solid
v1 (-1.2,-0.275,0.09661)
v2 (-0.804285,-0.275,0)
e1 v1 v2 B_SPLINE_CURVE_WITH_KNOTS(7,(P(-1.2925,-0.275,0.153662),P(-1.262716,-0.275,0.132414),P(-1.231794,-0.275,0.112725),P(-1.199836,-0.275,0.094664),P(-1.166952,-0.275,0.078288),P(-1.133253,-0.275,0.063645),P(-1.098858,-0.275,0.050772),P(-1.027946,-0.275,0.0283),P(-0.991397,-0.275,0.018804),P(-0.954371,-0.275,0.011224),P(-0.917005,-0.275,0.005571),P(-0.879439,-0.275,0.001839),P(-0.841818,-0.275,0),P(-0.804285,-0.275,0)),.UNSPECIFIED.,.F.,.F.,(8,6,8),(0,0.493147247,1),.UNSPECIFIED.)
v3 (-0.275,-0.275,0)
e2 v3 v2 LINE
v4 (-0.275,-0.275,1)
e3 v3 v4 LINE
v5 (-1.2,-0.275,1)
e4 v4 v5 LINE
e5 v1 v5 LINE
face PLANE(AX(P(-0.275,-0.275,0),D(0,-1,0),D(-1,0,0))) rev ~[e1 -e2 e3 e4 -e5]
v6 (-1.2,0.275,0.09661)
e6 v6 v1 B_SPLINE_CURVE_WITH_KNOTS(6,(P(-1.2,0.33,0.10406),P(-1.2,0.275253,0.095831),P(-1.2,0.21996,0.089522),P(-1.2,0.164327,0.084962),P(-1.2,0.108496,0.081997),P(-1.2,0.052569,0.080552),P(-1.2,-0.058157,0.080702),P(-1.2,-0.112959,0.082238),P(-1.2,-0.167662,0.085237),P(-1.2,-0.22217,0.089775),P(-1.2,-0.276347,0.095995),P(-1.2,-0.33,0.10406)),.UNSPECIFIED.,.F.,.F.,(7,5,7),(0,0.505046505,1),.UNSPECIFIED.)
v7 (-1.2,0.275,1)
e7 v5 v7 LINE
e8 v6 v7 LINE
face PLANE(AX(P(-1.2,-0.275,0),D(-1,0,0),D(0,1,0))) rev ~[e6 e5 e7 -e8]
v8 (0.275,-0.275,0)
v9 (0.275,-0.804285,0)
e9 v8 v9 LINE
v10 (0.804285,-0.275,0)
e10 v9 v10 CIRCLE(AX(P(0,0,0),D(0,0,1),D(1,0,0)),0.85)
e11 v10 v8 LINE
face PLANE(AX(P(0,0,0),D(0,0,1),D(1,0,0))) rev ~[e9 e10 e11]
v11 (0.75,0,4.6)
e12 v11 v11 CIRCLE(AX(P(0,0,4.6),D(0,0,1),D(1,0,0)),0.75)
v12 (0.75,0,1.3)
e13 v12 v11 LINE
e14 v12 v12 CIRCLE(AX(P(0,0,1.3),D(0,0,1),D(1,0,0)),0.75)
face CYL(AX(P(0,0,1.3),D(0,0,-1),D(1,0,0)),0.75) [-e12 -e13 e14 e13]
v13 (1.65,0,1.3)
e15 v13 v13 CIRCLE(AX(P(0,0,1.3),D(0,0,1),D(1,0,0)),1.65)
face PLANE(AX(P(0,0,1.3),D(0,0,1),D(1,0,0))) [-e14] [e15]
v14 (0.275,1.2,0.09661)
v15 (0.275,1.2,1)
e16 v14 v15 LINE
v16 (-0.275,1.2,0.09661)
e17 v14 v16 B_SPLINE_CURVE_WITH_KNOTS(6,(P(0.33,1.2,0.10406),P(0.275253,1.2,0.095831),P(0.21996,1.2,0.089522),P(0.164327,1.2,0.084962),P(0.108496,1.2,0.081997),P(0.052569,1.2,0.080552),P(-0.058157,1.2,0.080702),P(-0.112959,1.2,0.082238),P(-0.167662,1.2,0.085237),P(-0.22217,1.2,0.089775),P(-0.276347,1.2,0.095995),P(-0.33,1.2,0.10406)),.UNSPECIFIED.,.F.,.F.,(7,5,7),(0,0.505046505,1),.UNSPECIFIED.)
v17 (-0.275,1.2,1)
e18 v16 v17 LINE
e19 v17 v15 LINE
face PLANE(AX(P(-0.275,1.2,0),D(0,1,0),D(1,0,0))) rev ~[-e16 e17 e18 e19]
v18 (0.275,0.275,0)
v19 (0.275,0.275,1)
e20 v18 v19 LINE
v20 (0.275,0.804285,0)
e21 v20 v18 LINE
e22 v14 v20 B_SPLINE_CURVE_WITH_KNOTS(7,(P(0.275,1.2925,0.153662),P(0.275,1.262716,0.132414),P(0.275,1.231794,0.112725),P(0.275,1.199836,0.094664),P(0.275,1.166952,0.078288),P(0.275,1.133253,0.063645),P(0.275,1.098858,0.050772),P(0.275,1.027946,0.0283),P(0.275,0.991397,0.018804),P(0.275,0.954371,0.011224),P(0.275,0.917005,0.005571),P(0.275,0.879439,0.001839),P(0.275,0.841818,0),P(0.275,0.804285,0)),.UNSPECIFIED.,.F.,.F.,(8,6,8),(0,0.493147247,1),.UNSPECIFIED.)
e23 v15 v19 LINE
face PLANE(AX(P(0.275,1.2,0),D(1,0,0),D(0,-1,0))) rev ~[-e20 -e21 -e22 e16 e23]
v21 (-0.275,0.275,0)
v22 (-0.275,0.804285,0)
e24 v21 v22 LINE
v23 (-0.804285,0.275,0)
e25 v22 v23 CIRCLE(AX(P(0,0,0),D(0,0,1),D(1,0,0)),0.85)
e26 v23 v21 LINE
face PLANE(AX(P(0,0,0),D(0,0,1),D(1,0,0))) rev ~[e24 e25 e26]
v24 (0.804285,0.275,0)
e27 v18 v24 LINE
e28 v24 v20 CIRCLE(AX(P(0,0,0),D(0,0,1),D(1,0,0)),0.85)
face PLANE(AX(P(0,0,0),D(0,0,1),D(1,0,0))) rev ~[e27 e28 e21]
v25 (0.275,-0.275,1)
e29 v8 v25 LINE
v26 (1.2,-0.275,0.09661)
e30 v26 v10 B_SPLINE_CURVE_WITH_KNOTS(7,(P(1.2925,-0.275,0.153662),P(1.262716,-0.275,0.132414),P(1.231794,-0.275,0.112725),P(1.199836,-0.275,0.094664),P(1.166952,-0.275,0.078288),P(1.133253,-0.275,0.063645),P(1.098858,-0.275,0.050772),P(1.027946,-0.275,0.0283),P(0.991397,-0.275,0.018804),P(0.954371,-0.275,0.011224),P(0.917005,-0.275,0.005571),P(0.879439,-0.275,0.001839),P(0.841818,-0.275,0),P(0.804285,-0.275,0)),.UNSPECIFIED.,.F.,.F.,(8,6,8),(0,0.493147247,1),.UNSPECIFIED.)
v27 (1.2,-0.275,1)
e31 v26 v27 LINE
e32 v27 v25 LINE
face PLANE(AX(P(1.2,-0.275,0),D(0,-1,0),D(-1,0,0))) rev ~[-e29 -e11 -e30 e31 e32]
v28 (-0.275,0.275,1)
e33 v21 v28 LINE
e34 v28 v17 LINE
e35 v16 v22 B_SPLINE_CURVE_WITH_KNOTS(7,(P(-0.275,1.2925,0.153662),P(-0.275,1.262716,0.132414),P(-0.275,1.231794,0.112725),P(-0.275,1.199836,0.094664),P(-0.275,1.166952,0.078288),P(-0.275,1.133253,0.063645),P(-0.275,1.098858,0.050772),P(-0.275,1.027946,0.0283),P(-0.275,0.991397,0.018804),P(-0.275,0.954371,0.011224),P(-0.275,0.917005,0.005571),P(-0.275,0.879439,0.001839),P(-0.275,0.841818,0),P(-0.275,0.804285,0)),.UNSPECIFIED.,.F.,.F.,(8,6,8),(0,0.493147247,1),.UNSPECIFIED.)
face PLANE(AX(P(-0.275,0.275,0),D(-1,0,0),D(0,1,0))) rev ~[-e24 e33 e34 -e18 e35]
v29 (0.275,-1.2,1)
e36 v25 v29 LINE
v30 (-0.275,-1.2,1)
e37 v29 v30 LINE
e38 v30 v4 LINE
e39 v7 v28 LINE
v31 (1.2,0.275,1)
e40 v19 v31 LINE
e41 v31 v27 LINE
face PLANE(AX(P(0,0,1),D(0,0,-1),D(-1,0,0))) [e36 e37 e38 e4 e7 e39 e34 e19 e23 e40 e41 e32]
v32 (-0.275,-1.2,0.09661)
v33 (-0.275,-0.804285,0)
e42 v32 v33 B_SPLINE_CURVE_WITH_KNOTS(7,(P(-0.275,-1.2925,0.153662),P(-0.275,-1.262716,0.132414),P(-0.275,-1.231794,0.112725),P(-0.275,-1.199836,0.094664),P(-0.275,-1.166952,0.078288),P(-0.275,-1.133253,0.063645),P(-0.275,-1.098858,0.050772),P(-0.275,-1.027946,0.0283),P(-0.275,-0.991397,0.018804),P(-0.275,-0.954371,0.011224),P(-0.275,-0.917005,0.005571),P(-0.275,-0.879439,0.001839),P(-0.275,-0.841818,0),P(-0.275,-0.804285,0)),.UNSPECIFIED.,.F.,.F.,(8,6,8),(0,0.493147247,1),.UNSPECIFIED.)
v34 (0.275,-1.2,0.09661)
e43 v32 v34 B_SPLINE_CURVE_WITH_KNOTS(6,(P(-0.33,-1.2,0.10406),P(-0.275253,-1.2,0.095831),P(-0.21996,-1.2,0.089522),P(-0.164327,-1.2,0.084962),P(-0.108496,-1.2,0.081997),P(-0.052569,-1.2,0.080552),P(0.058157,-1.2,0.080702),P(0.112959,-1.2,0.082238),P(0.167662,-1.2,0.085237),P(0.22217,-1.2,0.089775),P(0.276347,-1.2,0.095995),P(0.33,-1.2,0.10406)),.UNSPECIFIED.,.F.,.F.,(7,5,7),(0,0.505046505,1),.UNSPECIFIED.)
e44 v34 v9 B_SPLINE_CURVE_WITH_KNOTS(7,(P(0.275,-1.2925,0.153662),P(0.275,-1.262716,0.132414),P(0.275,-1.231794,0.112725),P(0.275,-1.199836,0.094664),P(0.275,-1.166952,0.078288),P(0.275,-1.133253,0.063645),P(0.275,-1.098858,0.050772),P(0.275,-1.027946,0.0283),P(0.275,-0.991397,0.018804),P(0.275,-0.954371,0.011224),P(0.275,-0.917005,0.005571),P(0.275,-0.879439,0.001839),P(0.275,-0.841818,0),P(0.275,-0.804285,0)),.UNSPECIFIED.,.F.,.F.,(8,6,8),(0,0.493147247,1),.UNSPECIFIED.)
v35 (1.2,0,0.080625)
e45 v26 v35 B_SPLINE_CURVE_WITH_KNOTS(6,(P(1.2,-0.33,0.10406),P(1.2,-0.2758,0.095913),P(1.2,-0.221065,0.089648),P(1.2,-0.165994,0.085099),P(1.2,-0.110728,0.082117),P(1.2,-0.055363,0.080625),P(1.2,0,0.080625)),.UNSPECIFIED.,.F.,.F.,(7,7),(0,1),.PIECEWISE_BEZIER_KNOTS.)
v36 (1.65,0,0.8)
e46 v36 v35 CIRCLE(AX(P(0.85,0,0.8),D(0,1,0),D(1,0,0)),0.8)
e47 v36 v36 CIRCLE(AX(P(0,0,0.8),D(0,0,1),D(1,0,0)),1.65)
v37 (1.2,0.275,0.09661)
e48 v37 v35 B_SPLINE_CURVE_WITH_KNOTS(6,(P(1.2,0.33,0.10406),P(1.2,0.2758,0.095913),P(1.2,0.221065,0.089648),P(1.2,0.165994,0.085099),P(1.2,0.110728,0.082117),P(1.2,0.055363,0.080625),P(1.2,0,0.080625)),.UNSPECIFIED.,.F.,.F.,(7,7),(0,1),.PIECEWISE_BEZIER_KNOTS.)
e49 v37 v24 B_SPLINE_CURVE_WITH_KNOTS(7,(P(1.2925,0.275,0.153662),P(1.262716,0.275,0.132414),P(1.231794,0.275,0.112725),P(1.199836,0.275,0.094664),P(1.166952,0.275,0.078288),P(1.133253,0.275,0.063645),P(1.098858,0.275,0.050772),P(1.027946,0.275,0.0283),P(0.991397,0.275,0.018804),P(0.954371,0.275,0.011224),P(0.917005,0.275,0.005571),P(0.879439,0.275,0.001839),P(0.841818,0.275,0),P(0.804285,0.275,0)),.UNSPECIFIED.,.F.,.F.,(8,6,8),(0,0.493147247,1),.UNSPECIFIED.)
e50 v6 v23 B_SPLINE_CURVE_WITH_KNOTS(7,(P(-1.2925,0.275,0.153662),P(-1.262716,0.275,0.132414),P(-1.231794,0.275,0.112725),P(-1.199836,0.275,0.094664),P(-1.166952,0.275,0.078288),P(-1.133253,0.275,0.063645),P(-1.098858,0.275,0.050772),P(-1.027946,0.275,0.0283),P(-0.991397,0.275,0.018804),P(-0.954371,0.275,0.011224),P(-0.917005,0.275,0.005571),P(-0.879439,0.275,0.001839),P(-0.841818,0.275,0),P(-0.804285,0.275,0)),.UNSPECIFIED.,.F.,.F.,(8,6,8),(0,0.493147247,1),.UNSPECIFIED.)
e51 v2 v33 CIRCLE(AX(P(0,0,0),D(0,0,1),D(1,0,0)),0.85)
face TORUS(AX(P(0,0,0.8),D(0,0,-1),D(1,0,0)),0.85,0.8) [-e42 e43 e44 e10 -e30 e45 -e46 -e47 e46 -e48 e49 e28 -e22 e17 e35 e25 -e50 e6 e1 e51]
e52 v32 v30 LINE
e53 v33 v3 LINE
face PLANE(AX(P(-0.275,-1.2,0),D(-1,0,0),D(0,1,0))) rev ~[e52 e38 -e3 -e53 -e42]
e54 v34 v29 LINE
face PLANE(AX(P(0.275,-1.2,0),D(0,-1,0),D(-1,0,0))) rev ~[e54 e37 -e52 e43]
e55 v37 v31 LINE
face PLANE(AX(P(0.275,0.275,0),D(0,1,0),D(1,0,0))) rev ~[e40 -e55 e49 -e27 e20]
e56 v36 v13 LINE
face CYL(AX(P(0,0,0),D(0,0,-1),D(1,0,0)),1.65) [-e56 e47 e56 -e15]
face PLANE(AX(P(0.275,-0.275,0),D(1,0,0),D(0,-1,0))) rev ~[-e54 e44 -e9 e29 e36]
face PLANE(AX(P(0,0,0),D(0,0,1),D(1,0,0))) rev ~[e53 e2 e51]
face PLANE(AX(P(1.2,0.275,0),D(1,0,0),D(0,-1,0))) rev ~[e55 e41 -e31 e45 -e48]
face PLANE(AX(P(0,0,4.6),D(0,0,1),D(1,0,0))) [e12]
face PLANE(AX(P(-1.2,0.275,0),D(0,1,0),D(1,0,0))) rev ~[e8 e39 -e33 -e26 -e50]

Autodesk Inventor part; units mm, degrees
ref_plane "YZ Plane" through (0, 0, 0) normal (1, 0, 0) x (0, 1, 0)
ref_plane "XZ Plane" through (0, 0, 0) normal (0, 1, 0) x (-1, 0, 0)
ref_plane "XY Plane" through (0, 0, 0) normal (0, 0, 1) x (1, 0, 0)
sketch "Skizze1" plane through (0, 0, 0) normal (0, 0, 1) x (1, 0, 0)
  circle A0 centre (0, 0) radius 1.65
  dimension "d0" = 3.3
extrude "Extrusion1" add sketch "Skizze1" along normal blind 1.3
sketch "Skizze2" plane through (0, 0, 1.3) normal (0, 0, 1) x (1, 0, 0)
  circle A0 centre (0, 0) radius 0.75
  dimension "d3" = 1.5
extrude "Extrusion2" add sketch "Skizze2" along normal blind 3.3
sketch "Skizze3" plane through (0, 0, 0) normal (0, 0, -1) x (-1, 0, 0)
  line L0 (-0.275, -1.2) -> (0.275, -1.2)
  line L1 (0.275, -1.2) -> (0.275, 1.2)
  line L2 (0.275, 1.2) -> (-0.275, 1.2)
  line L3 (-0.275, 1.2) -> (-0.275, -1.2)
  line L4 (-0.275, -1.2) -> (0.275, 1.2) construction
  line L5 (0.275, -1.2) -> (-0.275, 1.2) construction
  line L6 (-1.2, -0.275) -> (1.2, -0.275)
  line L7 (1.2, -0.275) -> (1.2, 0.275)
  line L8 (1.2, 0.275) -> (-1.2, 0.275)
  line L9 (-1.2, 0.275) -> (-1.2, -0.275)
  line L10 (-1.2, -0.275) -> (1.2, 0.275) construction
  line L11 (1.2, -0.275) -> (-1.2, 0.275) construction
  point P0 (0, 0)
  dimension "d6" = 0.55
  dimension "d7" = 0.55
  dimension "d8" = 2.4
  dimension "d9" = 2.4
extrude "Extrusion3" cut sketch "Skizze3" against normal blind 1
fillet "Rundung1" radius 0.8 1 edges at (-1.65, 0, 0)
equation "\"d7\" = d6"
properties part number "screw" material "Stahl"
